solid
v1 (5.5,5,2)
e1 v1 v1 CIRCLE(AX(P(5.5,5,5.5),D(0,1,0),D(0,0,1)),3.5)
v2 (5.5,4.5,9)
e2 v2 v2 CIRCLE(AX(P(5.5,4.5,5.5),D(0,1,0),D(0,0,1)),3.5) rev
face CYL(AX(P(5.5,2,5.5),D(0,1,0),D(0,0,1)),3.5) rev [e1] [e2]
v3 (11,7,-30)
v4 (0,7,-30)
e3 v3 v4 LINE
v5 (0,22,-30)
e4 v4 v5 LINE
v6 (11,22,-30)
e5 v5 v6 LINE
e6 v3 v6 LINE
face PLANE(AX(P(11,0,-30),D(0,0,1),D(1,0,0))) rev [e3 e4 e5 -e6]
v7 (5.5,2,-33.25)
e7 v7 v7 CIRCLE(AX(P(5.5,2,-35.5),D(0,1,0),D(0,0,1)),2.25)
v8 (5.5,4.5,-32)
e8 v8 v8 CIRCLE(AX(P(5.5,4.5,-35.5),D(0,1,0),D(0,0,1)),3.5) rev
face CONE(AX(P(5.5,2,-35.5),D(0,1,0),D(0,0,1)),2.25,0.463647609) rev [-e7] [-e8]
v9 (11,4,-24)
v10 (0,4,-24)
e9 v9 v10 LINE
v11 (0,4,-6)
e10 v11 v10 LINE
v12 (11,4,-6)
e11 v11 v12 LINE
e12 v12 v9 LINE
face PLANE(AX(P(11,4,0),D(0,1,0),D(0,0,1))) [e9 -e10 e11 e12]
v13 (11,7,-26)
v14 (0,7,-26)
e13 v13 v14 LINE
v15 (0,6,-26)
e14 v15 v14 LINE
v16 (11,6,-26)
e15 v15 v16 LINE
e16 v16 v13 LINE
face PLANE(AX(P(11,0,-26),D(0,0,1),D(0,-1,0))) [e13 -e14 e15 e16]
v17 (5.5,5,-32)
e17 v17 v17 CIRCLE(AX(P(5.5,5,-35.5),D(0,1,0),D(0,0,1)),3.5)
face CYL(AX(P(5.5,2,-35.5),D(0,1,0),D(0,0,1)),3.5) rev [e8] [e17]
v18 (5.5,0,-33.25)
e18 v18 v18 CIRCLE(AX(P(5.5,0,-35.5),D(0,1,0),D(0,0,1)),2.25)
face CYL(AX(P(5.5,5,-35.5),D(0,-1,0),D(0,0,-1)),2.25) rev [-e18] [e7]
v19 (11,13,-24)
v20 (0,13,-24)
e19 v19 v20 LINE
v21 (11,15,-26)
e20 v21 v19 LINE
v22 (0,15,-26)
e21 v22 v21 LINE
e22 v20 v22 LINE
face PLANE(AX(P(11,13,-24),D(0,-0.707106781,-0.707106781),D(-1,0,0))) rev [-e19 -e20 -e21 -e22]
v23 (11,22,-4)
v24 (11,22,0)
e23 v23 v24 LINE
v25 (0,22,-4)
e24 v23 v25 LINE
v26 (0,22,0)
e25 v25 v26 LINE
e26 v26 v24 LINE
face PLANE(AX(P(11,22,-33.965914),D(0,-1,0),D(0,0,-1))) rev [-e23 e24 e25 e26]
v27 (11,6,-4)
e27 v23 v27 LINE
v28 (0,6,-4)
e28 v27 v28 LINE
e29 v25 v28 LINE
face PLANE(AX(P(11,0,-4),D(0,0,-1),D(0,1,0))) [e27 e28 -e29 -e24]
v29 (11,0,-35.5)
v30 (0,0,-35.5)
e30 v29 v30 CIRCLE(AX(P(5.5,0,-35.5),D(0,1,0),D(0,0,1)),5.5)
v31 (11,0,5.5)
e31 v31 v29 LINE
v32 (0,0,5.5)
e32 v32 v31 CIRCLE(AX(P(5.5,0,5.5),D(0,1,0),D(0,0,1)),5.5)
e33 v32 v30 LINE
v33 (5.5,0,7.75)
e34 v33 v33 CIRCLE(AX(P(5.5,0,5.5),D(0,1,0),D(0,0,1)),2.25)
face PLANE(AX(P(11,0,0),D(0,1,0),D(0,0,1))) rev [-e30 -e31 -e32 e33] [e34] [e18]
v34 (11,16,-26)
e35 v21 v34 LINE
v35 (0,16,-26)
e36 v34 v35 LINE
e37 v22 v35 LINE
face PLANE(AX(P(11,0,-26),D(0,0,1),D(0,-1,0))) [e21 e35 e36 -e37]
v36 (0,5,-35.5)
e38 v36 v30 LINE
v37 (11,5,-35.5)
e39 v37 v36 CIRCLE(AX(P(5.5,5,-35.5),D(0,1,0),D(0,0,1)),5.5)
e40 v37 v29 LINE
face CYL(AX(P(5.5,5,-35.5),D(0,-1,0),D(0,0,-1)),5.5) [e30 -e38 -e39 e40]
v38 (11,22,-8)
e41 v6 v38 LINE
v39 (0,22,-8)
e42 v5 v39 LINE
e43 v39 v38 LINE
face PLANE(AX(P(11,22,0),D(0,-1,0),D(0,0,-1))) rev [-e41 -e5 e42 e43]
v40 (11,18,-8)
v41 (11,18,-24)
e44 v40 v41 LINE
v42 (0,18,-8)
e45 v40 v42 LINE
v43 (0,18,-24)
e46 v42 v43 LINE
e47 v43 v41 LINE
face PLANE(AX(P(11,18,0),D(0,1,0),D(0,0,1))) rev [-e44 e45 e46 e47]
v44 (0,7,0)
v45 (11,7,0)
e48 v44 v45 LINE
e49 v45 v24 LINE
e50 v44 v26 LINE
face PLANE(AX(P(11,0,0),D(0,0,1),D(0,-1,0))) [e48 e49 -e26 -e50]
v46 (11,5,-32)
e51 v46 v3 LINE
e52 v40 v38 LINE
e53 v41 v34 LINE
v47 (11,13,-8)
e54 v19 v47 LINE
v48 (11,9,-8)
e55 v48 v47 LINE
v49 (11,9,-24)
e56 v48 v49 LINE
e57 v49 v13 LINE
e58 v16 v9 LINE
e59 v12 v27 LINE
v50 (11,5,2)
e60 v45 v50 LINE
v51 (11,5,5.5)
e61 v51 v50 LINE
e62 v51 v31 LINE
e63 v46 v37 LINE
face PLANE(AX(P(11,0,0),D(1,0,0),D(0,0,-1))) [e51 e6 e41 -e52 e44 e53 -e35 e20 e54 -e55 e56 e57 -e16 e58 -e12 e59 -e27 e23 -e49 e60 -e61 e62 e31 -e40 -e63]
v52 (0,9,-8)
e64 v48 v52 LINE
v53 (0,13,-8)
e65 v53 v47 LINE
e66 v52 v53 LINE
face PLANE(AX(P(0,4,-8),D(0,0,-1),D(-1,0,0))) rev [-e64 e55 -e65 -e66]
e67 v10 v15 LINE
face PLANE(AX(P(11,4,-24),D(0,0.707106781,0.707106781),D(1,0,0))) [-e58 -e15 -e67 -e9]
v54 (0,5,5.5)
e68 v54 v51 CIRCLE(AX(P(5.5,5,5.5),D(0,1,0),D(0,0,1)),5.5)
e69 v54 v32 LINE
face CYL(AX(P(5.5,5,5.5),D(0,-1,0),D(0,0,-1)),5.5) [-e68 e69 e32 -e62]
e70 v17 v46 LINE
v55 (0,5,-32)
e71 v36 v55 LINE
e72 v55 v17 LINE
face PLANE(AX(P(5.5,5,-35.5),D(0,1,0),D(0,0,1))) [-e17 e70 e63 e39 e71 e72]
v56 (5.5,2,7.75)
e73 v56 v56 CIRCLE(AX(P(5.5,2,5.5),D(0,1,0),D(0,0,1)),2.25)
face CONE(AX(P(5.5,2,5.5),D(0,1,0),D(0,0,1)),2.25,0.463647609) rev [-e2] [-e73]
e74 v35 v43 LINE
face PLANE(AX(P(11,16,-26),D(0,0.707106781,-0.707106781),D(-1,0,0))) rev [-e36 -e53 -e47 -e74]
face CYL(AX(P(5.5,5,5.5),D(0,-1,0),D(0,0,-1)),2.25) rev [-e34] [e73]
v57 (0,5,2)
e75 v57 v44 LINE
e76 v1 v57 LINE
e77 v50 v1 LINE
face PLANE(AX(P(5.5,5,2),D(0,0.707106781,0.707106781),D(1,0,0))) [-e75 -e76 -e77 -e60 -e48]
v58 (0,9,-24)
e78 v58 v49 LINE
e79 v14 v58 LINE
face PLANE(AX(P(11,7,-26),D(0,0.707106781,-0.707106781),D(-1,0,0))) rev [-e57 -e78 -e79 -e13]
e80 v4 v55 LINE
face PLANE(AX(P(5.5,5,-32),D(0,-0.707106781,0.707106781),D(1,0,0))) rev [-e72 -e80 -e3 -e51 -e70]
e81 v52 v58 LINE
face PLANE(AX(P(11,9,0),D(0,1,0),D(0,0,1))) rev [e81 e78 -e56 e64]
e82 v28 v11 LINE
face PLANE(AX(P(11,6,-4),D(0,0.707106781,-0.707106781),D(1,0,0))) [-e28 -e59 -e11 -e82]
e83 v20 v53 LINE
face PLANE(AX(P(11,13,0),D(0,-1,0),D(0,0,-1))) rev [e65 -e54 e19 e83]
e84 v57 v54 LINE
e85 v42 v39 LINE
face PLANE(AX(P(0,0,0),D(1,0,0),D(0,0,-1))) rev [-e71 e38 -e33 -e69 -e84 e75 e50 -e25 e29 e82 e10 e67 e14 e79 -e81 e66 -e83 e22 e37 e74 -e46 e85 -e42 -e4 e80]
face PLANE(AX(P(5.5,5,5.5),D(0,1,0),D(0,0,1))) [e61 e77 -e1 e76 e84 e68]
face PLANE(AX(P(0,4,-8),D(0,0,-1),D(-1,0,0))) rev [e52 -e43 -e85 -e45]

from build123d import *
from OCP.BRepFilletAPI import BRepFilletAPI_MakeChamfer

# Parameters (mm, degrees)
SKETCH1_W           = 30
SKETCH1_H           = 58
SKETCH1_W_2         = 22
SKETCH1_H_2         = 5
BOSS_EXTRUDE1_DEPTH = 11
CUT_EXTRUDE2_START  = -49
SKETCH2_W           = 11
SKETCH2_H           = 4
CUT_EXTRUDE2_DEPTH  = 49
SKETCH3_R           = 2.25
BOSS_EXTRUDE2_DEPTH = 5
SKETCH4_R           = 3.5
CUT_EXTRUDE3_DEPTH  = 3
CHAMFER1_SIZE       = 2.5
CHAMFER1_SIZE_2     = 1.25
CHAMFER2_SIZE       = 2
SKETCH6_W           = 39.025206684
SKETCH6_H           = 36
CUT_EXTRUDE5_DEPTH  = 72.874891304


with BuildPart() as part:
    # Sketch1 → Boss-Extrude1 (new body)
    with BuildSketch(Plane(origin=(0, 0, 0), x_dir=(0, 0, -1), z_dir=(1, 0, 0))):
        with Locations((15, 29)):
            Rectangle(SKETCH1_W, SKETCH1_H)
        with Locations((15, 42.5)):
            Rectangle(SKETCH1_W_2, SKETCH1_H_2, mode=Mode.SUBTRACT)
        with Locations((15, 6.5)):
            Rectangle(SKETCH1_W_2, SKETCH1_H_2, mode=Mode.SUBTRACT)
        with Locations((15, 15.5)):
            Rectangle(SKETCH1_W_2, SKETCH1_H_2, mode=Mode.SUBTRACT)
        with Locations((15, 51.5)):
            Rectangle(SKETCH1_W_2, SKETCH1_H_2, mode=Mode.SUBTRACT)
        with Locations((15, 33.5)):
            Rectangle(SKETCH1_W_2, SKETCH1_H_2, mode=Mode.SUBTRACT)
        with Locations((15, 24.5)):
            Rectangle(SKETCH1_W_2, SKETCH1_H_2, mode=Mode.SUBTRACT)
    extrude(amount=BOSS_EXTRUDE1_DEPTH)

    # Sketch2 → Cut-Extrude2 (cut)
    with BuildSketch(Plane(origin=(0, 58, 0), x_dir=(1, 0, 0), z_dir=(0, 1, 0)).offset(CUT_EXTRUDE2_START)):
        with Locations((5.5, 6)):
            Rectangle(SKETCH2_W, SKETCH2_H)
    extrude(amount=CUT_EXTRUDE2_DEPTH, mode=Mode.SUBTRACT)

    # Sketch3 → Boss-Extrude2 (add)
    # profile 1 of 2: a face of its own
    with BuildSketch(Plane(origin=(0, 0, 0), x_dir=(1, 0, 0), z_dir=(0, 1, 0))):
        with BuildLine():
            Line((0, 0), (0, -5.5))
            ThreePointArc((0, -5.5), (5.5, -11), (11, -5.5))
            Line((11, -5.5), (11, 0))
            Line((11, 0), (0, 0))
        make_face()
        with Locations(Location((5.5, -5.5, 0), (0, 0, 270))):
            Circle(SKETCH3_R, mode=Mode.SUBTRACT)
    # profile 2 of 2: a face of its own
    with BuildSketch(Plane(origin=(0, 0, 0), x_dir=(1, 0, 0), z_dir=(0, 1, 0))):
        with BuildLine():
            Line((11, 35.5), (11, 30))
            Line((11, 30), (0, 30))
            Line((0, 30), (0, 35.5))
            ThreePointArc((0, 35.5), (5.5, 41), (11, 35.5))
        make_face()
        with Locations(Location((5.5, 35.5, 0), (0, 0, 270))):
            Circle(SKETCH3_R, mode=Mode.SUBTRACT)
    extrude(amount=BOSS_EXTRUDE2_DEPTH)

    # Sketch4 → Cut-Extrude3 (cut)
    with BuildSketch(Plane(origin=(0, 5, 0), x_dir=(1, 0, 0), z_dir=(0, 1, 0))):
        with Locations(Location((5.5, -5.5, 0), (0, 0, 270))):
            Circle(SKETCH4_R)
        with Locations(Location((5.5, 35.5, 0), (0, 0, 270))):
            Circle(SKETCH4_R)
    extrude(amount=-CUT_EXTRUDE3_DEPTH, mode=Mode.SUBTRACT)

    # Chamfer1
    chamfer1_edges_1 = [part.edges().sort_by_distance(p)[0] for p in [
        (5.5, 2, 2),
    ]]
    chamfer1_side_1 = [part.faces().sort_by_distance(p)[0] for p in [
        (5.5, 2.025, 2),
    ]]
    chamfer1_edges_2 = [part.edges().sort_by_distance(p)[0] for p in [
        (5.5, 2, -39),
    ]]
    chamfer1_side_2 = [part.faces().sort_by_distance(p)[0] for p in [
        (5.5, 2.025, -39),
    ]]
    chamfer1 = BRepFilletAPI_MakeChamfer(part.part.solid().wrapped)
    for e in chamfer1_edges_1:
        chamfer1.Add(CHAMFER1_SIZE - 0.0001, CHAMFER1_SIZE_2 - 0.0001, e.wrapped, chamfer1_side_1[0].wrapped)
    for e in chamfer1_edges_2:
        chamfer1.Add(CHAMFER1_SIZE - 0.0001, CHAMFER1_SIZE_2 - 0.0001, e.wrapped, chamfer1_side_2[0].wrapped)
    add(Compound.cast(chamfer1.Shape()), mode=Mode.REPLACE)  # a hair under: the kernel refuses the full size

    # Chamfer2
    chamfer2_edges = [part.edges().sort_by_distance(p)[0] for p in [
        (5.5, 5, 0),
        (5.5, 5, -30),
        (5.5, 4, -4),
        (5.5, 4, -26),
        (5.5, 9, -26),
        (5.5, 40, -26),
        (5.5, 45, -26),
        (5.5, 13, -26),
        (5.5, 18, -26),
        (5.5, 54, -26),
        (5.5, 49, -26),
        (5.5, 36, -26),
        (5.5, 31, -26),
        (5.5, 22, -26),
        (5.5, 27, -26),
    ]]
    chamfer(chamfer2_edges, length=CHAMFER2_SIZE - 0.0001)  # a hair under: the kernel refuses the full size

    # Sketch6 → Cut-Extrude5 (cut, through all)
    with BuildSketch(Plane.ZY):
        with Locations((-14.453310682, 40)):
            Rectangle(SKETCH6_W, SKETCH6_H)
    extrude(amount=-CUT_EXTRUDE5_DEPTH, mode=Mode.SUBTRACT)


solid = part.part
